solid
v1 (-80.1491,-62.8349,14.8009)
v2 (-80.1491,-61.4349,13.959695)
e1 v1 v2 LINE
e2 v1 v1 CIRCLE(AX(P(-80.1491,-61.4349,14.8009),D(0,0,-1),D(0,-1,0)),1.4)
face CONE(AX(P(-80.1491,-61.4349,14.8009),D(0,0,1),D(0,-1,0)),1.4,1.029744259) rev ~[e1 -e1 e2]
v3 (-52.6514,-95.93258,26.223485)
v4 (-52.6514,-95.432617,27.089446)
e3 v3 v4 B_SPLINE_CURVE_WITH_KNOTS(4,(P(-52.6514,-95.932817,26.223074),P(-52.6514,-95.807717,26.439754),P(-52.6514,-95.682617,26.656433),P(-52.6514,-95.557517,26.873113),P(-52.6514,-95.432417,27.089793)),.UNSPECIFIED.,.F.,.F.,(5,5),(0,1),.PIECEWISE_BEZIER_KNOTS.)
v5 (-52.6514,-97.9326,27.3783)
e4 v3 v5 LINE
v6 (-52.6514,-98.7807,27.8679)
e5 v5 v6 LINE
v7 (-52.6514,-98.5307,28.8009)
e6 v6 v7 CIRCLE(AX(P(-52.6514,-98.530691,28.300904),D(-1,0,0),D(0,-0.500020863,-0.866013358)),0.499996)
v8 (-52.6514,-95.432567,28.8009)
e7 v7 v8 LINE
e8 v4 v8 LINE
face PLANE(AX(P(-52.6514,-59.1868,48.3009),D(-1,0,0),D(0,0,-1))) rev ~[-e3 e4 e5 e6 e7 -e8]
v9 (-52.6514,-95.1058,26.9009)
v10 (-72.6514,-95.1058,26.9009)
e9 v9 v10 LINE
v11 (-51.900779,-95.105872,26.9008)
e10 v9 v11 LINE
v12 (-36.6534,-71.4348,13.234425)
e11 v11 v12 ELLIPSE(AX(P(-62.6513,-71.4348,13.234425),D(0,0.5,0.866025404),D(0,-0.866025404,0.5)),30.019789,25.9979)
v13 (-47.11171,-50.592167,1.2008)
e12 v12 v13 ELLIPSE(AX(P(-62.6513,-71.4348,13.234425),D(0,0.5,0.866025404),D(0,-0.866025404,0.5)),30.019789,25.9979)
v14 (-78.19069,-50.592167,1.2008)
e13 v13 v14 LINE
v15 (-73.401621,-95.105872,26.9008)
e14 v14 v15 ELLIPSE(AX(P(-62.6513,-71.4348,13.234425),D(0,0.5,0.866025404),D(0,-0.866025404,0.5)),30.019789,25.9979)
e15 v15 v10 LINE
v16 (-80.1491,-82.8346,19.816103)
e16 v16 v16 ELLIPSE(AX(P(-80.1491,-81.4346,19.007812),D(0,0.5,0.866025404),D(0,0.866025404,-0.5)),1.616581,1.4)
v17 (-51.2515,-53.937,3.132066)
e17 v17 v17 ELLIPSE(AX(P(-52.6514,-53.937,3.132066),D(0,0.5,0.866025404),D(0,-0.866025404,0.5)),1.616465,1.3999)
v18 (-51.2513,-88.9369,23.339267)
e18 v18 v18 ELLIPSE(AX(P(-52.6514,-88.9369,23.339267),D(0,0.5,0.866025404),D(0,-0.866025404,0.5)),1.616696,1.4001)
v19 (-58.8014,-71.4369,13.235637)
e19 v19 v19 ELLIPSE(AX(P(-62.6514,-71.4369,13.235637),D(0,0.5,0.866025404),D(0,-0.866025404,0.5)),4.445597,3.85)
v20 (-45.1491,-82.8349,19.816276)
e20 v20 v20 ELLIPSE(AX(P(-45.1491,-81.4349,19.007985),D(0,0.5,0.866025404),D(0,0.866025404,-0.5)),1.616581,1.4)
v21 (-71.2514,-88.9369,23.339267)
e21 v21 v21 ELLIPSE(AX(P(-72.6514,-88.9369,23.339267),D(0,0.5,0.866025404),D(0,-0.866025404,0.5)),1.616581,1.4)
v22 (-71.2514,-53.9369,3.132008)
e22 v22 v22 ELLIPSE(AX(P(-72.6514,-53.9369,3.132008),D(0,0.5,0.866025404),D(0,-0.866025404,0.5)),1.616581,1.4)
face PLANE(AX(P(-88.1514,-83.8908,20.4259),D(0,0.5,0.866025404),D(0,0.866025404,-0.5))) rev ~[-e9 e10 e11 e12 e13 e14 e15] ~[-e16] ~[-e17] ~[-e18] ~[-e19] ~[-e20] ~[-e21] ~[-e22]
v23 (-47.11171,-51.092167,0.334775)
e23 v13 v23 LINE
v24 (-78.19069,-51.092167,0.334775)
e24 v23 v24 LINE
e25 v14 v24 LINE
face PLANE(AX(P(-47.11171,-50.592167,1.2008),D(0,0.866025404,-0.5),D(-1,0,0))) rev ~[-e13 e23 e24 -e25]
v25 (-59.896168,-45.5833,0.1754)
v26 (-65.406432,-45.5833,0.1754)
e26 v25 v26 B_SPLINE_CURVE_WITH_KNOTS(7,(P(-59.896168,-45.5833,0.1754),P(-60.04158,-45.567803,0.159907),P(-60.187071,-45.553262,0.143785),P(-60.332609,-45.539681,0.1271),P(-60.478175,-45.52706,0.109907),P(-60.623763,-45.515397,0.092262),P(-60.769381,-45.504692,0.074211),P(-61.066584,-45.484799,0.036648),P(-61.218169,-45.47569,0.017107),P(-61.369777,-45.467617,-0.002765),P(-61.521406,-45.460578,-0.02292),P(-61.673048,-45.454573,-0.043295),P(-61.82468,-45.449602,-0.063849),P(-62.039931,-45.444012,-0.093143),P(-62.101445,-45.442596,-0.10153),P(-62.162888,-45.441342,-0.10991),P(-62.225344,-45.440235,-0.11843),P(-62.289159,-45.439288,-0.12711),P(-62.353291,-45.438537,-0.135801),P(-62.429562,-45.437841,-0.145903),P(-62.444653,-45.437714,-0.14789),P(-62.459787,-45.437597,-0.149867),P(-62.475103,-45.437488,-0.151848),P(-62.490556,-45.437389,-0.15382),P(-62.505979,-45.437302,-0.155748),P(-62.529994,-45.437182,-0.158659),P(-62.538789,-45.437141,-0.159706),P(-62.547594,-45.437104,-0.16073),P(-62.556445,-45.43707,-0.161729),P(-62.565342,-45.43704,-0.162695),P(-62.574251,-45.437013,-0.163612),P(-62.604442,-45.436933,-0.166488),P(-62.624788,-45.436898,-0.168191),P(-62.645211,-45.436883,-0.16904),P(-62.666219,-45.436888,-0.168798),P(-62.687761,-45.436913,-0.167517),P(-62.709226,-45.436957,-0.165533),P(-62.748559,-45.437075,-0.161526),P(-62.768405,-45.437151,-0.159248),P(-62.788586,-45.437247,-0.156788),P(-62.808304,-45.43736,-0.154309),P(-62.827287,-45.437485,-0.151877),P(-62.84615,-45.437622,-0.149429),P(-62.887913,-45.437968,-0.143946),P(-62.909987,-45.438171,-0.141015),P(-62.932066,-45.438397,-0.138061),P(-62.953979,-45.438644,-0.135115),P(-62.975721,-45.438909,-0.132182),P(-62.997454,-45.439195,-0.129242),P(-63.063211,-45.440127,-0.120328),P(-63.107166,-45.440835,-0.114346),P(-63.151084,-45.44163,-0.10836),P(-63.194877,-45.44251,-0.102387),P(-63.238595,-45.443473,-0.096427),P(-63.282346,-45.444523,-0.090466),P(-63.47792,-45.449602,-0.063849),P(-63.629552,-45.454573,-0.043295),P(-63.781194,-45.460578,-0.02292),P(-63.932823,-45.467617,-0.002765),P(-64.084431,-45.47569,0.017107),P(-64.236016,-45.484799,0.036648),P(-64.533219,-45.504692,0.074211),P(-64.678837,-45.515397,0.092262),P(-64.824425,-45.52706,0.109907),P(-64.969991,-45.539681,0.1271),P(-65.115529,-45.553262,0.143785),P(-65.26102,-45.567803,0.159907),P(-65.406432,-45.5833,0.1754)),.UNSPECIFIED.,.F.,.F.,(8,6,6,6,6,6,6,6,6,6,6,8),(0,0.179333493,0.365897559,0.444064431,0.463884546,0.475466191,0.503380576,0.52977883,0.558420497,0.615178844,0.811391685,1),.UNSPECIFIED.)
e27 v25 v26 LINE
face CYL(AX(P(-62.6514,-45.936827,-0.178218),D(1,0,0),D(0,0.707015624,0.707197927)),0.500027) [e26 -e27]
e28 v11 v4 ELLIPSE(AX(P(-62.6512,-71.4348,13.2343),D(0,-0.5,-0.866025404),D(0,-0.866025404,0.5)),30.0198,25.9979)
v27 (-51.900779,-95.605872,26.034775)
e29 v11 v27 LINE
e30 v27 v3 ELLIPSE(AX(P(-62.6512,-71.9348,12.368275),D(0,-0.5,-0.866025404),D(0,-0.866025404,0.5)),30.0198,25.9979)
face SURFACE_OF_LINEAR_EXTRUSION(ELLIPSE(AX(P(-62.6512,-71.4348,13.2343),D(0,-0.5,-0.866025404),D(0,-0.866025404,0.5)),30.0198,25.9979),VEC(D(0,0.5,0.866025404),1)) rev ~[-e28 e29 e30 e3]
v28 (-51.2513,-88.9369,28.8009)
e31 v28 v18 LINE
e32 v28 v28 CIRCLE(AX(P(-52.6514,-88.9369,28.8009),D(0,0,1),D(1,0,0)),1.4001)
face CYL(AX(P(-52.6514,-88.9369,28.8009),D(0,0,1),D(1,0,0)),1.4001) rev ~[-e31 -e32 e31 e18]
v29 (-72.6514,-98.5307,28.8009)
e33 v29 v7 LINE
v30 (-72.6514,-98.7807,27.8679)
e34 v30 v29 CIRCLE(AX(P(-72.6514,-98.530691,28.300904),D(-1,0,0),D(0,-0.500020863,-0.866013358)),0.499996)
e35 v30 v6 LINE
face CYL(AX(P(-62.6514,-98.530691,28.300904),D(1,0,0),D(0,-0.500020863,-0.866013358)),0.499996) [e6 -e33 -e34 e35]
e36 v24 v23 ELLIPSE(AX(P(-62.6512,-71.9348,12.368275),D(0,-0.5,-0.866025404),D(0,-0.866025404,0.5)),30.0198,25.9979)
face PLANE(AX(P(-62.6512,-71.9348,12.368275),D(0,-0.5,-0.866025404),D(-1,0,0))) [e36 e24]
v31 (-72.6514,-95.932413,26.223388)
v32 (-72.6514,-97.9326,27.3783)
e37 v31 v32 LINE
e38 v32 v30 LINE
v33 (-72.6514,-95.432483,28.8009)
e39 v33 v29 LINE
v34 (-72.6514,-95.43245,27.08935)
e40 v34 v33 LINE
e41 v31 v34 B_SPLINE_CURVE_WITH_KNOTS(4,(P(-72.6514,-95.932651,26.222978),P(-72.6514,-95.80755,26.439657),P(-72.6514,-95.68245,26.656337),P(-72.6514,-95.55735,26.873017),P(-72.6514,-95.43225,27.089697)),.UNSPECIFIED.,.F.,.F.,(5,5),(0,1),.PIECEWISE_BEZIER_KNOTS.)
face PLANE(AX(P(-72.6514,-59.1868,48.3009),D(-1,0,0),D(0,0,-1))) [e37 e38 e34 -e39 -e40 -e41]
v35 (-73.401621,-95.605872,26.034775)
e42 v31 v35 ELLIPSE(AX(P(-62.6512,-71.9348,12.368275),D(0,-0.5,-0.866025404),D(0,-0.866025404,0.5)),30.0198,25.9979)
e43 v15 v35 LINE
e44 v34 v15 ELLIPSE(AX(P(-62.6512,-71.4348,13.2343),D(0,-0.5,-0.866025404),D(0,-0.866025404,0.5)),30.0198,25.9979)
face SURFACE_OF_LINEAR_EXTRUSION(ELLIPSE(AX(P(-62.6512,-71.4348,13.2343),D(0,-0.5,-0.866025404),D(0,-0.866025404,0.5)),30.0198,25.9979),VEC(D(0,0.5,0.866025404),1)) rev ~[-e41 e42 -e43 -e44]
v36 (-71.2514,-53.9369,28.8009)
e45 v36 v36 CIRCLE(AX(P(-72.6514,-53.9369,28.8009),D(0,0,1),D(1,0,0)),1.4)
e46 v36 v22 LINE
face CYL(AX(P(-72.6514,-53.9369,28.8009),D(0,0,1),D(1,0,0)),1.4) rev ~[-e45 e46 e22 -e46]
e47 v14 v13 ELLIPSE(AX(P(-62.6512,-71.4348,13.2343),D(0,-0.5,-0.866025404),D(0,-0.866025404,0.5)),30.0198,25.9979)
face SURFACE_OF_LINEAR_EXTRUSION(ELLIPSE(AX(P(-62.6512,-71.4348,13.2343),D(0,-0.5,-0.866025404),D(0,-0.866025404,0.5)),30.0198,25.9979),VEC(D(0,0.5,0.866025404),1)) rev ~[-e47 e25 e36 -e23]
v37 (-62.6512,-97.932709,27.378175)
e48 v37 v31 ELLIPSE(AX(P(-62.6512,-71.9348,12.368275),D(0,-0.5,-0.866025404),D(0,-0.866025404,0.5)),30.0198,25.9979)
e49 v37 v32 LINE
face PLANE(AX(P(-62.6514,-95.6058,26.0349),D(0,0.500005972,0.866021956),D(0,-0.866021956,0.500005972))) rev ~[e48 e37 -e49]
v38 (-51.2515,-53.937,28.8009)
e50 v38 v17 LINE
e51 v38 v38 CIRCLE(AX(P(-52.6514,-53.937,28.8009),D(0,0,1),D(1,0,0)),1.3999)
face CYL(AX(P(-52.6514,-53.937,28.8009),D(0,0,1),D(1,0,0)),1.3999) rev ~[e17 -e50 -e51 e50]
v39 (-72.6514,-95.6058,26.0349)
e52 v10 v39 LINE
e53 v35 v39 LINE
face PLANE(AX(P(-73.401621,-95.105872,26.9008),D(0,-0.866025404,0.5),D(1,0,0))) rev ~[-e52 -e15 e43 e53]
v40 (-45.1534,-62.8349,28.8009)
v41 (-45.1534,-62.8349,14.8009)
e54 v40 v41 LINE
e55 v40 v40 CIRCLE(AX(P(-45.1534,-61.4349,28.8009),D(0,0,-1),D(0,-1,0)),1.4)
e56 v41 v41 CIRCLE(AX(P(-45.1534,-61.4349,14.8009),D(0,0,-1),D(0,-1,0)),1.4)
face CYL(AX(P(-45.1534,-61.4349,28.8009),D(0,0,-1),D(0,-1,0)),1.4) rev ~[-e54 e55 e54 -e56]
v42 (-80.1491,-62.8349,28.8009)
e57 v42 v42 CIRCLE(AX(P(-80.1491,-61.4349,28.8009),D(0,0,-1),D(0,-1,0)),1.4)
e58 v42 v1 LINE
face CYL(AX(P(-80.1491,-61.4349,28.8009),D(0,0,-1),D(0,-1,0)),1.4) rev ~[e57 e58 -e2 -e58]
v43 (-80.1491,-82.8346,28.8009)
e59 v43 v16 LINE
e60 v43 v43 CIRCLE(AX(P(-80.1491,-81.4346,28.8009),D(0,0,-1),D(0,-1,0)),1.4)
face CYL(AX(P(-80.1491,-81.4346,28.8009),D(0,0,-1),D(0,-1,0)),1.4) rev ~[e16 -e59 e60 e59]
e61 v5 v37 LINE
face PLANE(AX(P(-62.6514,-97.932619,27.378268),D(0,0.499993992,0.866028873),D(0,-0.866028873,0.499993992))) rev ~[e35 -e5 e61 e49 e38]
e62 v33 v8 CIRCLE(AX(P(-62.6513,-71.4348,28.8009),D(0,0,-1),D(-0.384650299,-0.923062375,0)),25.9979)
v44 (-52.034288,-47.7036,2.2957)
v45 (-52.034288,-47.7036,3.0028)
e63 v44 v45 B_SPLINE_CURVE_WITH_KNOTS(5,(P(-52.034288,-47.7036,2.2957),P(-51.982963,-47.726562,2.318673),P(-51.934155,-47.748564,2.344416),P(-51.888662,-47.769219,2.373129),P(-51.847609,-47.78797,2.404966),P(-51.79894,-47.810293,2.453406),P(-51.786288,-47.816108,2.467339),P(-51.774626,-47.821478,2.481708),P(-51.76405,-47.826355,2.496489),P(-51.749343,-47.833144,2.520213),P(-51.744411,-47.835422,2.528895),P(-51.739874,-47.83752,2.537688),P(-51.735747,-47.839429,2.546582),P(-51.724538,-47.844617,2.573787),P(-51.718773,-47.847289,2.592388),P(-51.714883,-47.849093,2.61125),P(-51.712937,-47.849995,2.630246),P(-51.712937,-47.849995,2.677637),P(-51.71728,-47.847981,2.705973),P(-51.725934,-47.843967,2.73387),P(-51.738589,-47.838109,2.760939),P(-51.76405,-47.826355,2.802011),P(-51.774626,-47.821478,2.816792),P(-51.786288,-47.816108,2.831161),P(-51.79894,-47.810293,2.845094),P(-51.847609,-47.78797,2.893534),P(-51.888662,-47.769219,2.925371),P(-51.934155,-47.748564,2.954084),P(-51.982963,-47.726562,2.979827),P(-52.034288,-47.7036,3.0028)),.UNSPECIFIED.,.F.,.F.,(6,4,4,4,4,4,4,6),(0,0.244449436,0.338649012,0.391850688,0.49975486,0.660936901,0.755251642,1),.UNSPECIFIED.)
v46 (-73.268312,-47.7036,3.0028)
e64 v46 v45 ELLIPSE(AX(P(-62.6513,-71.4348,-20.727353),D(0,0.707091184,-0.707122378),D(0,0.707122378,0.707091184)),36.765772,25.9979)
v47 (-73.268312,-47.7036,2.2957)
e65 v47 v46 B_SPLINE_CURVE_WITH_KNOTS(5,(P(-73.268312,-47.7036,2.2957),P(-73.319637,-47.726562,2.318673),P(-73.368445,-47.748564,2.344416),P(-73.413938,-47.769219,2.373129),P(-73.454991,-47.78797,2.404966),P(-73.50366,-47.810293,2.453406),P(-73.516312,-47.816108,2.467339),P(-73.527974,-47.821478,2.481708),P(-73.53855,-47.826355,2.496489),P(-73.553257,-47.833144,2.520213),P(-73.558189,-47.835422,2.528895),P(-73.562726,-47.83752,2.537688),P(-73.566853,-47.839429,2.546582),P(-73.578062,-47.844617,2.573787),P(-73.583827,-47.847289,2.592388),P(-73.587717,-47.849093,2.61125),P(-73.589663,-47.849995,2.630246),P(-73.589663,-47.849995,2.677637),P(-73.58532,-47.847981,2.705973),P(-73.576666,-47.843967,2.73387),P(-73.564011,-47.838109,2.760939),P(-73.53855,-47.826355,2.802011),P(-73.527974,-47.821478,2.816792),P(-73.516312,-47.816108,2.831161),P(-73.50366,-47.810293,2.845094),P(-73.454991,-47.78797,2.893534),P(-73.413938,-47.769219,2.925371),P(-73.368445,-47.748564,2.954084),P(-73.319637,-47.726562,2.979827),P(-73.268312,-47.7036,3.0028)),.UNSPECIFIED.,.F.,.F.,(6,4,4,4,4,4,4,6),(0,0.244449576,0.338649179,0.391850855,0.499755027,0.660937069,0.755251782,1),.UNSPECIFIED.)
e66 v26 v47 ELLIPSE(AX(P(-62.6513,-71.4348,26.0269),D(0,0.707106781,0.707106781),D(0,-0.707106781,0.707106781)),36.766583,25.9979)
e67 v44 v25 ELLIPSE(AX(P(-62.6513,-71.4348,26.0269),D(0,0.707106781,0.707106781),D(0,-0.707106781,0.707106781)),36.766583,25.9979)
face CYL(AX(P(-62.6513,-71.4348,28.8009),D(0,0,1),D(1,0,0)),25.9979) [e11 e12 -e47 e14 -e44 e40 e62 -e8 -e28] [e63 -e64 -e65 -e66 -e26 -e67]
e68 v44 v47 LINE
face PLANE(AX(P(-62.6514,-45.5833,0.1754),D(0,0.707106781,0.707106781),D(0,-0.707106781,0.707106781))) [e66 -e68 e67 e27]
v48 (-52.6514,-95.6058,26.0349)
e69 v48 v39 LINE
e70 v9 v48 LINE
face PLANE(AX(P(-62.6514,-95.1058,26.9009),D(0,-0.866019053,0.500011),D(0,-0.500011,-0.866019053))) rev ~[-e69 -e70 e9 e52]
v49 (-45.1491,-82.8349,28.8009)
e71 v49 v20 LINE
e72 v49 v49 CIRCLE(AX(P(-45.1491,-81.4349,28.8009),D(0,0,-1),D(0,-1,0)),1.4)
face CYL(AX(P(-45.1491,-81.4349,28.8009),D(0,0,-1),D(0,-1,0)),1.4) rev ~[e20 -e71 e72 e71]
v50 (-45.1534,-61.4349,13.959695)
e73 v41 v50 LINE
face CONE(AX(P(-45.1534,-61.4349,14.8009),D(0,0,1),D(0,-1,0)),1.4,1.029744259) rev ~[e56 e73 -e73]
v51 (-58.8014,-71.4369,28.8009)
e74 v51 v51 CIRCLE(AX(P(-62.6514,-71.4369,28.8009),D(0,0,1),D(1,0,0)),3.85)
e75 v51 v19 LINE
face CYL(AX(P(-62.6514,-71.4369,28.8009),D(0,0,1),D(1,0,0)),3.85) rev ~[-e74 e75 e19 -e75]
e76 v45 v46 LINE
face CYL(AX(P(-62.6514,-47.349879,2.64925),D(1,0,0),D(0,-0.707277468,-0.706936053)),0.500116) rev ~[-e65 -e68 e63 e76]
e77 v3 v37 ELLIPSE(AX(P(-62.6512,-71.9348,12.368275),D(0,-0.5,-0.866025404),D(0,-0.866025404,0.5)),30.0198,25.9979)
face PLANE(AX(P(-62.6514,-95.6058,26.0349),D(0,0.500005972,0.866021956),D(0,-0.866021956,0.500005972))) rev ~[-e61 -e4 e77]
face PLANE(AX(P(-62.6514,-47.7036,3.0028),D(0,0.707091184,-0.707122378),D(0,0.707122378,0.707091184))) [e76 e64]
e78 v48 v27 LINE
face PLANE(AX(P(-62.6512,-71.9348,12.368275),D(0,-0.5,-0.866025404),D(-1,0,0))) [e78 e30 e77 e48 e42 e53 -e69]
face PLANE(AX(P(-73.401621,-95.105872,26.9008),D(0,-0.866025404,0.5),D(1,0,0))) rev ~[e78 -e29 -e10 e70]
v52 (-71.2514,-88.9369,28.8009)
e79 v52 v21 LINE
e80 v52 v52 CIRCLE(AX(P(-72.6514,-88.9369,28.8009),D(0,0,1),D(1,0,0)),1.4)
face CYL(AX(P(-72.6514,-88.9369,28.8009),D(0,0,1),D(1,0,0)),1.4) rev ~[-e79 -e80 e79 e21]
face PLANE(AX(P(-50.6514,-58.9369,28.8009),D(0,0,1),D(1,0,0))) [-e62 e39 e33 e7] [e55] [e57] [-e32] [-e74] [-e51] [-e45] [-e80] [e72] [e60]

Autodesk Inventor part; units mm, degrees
ref_plane "YZ Plane" through (0, 0, 0) normal (1, 0, 0) x (0, 1, 0)
ref_plane "XZ Plane" through (0, 0, 0) normal (0, 1, 0) x (-1, 0, 0)
ref_plane "Work Plane1" through (-50.6514, -58.9369, 28.8009) normal (0, 0, 1) x (1, 0, 0)
ref_plane "Arbeitsebene5" through (-88.1514, -83.8908, 20.4259) normal (0, 0.5, 0.8660254) x (1, 0, 0)
sketch "Sketch1" plane through (-50.6514, -58.9369, 28.8009) normal (0, 0, 1) x (1, 0, 0)
  circle A0 centre (-11.9999, -12.4979) radius 25.9979 projected
  circle A1 centre (-2, 4.9999) radius 1.3999 projected
  circle A2 centre (-22, 5) radius 1.4 projected
  circle A3 centre (-12, -12.5) radius 3.85 projected
  line L0 (-5, -5) -> (-5, 0) projected
  line L1 (0, 0) -> (0, -5) projected
  circle A4 centre (-22, -30) radius 1.4 projected
  circle A5 centre (-2, -30) radius 1.4001 projected
  line L2 (-5, 0) -> (0, 0)
  line L3 (0, 0) -> (0, -5)
  line L4 (0, -5) -> (-5, -5)
  line L5 (-5, -5) -> (-5, 0)
  circle A6 centre (-12, -12.5) radius 4
  point P0 (50.6514, 58.9369)
  dimension "d2" = 8
extrude "Extrusion1" add sketch "Sketch1" against normal up to surface contours A0 | L0 L2 L1 L4 | A6 surface through (-88.1514, -83.8908, 20.4259) normal (0, 0.5, 0.8660254)
sketch "Skizze17" plane through (-62.6512, -71.4348, 13.2343) normal (0, -0.5, -0.8660254) x (-1, 0, 0)
  line L0 (23.5002, 23.867) -> (-23.4998, 23.867) projected
  arc A0 (-23.4998, 23.867) -> (-25.4998, 21.867) centre (-23.4998, 21.867) ccw projected
  line L1 (-25.4998, 21.867) -> (-25.4998, -25.133) projected
  arc A1 (-25.4998, -25.133) -> (-23.4998, -27.133) centre (-23.4998, -25.133) ccw projected
  line L2 (-23.4998, -27.133) -> (23.5002, -27.133) projected
  arc A2 (23.5002, -27.133) -> (25.5002, -25.133) centre (23.5002, -25.133) ccw projected
  line L3 (25.5002, -25.133) -> (25.5002, 21.867) projected
  arc A3 (25.5002, 21.867) -> (23.5002, 23.867) centre (23.5002, 21.867) ccw projected
  line L4 (-17.4998, 11.367) -> (17.5002, 11.367) projected
  line L5 (17.5002, 11.367) -> (17.5002, -12.633) projected
  line L6 (17.5002, -12.633) -> (-17.4998, -12.633) projected
  line L7 (-17.4998, -12.633) -> (-17.4998, 11.367) projected
  line L8 (-23.4998, 24.067) -> (23.5002, 24.067)
  arc A4 (25.7002, 21.867) -> (23.5002, 24.067) centre (23.5002, 21.867) ccw
  line L9 (25.7002, 21.867) -> (25.7002, -25.133)
  arc A5 (23.5002, -27.333) -> (25.7002, -25.133) centre (23.5002, -25.133) ccw
  line L10 (23.5002, -27.333) -> (-23.4998, -27.333)
  arc A6 (-25.6998, -25.133) -> (-23.4998, -27.333) centre (-23.4998, -25.133) ccw
  line L11 (-25.6998, -25.133) -> (-25.6998, 21.867)
  arc A7 (-23.4998, 24.067) -> (-25.6998, 21.867) centre (-23.4998, 21.867) ccw
  ellipse E0 centre (-9.9998, 20.2048) end of major axis (-9.9998, 21.8213) minor radius 1.3999 projected
  ellipse E1 centre (10.0001, 20.2048) end of major axis (10.0001, 21.8213) minor radius 1.4 projected
  ellipse E2 centre (0.0001, -0.0025) end of major axis (0.0001, 4.4432) minor radius 3.85 projected
  ellipse E3 centre (10.0001, -20.2097) end of major axis (10.0001, -18.5931) minor radius 1.4 projected
  ellipse E4 centre (-9.9999, -20.2096) end of major axis (-9.9999, -18.593) minor radius 1.4001 projected
  ellipse E5 centre (0, 0) end of major axis (0, -30.0198) minor radius 25.9979 projected
  point P0 (-62.6512, 68.4815)
  point P1 (15.5395, 24.067)
  point P2 (-15.5395, 24.067)
  point P3 (10.7503, -27.333)
  point P4 (-10.7503, -27.333)
  dimension "d65" = 0.2
extrude "Extrusion13" add sketch "Skizze17" along normal blind 1 contours L8 E5 | E5 L10
ref_plane "Arbeitsebene6" through (-62.6514, -59.1868, 48.3009) normal (-1, 0, 0) x (0, 0, -1)
sketch "Skizze18" plane through (-62.6514, -59.1868, 48.3009) normal (-1, 0, 0) x (0, 0, -1)
  line L0 (47.1, -8.5947) -> (47.1, -8.5947) projected
  line L1 (47.1, -8.5947) -> (47.966, -8.0947) projected
  line L2 (47.966, -8.0947) -> (47.966, -8.0947) projected
  line L3 (47.1, -8.5947) -> (47.966, -8.0947) projected
  line L4 (21.4, 35.919) -> (21.4, 35.919) projected
  line L5 (21.4, 35.919) -> (22.266, 36.419) projected
  line L6 (22.266, 36.419) -> (22.266, 36.419) projected
  line L7 (21.4, 35.919) -> (22.266, 36.419) projected
  line L8 (21.4, 35.919) -> (22.266, 36.419) projected
  line L9 (22.266, 36.419) -> (19.5, 34.8221)
  line L10 (19.5, 38.2458) -> (19.5, -13.75) projected
  line L11 (22.266, 36.419) -> (19.5, 34.8221)
  line L12 (22.266, 36.419) -> (20.9226, 38.7458) projected
  line L13 (22.266, 36.419) -> (20.433, 39.5939)
  line L14 (19.5, 39.3439) -> (19.5, 34.8221)
  arc A0 (20.433, 39.5939) -> (19.5, 39.3439) centre (20, 39.3439) ccw
  point P0 (48.3009, -59.1868)
  point P1 (19.5, 38.2458)
  point P2 (20.9226, 38.7458)
  dimension "d68" = 0.5
extrude "Extrusion14" add sketch "Skizze18" along normal mid plane 20
sketch "Skizze19" plane through (-62.6514, -59.1868, 48.3009) normal (-1, 0, 0) x (0, 0, -1)
  line L0 (47.1, -8.5947) -> (47.1, -8.5947) projected
  line L1 (47.1, -8.5947) -> (47.966, -8.0947) projected
  line L2 (47.966, -8.0947) -> (47.966, -8.0947) projected
  line L3 (47.1, -8.5947) -> (47.966, -8.0947) projected
  line L4 (48.1255, -13.6035) -> (46.0052, -11.4832)
  line L5 (48.4791, -13.75) -> (51.4776, -13.75) construction
  line L6 (45.2981, -11.4832) -> (43.0314, -13.75)
  line L7 (19.5, -13.75) -> (50.0764, -13.75) projected
  line L8 (43.0314, -13.75) -> (48.272, -13.75)
  arc A0 (46.0052, -11.4832) -> (45.2981, -11.4832) centre (45.6517, -11.8368) ccw
  arc A1 (48.1255, -13.6035) -> (48.4791, -13.75) centre (48.4791, -13.25) ccw
  point P0 (48.3009, -59.1868)
  point P1 (48.4791, -13.75)
  dimension "d71" = 135
  dimension "d72" = 90
  dimension "d73" = 0.5
extrude "Extrusion15" cut sketch "Skizze19" along normal through all both and the other way through all
sketch "Skizze20" plane through (-50.6514, -58.9369, 28.8009) normal (0, 0, 1) x (1, 0, 0)
  circle A0 centre (-29.4977, -2.4981) radius 1.3999
  circle A1 centre (-29.4977, -22.498) radius 1.4
  circle A2 centre (-11.9977, -12.498) radius 3.85
  circle A3 centre (5.5022, -22.498) radius 1.4
  circle A4 centre (5.5022, -2.498) radius 1.4001
  arc A5 (-2.0001, -36.4957) -> (-22.0001, -36.4955) centre (-11.9999, -12.4979) ccw
  line L0 (-22.0001, -39.5939) -> (-22.0001, -36.4955)
  line L1 (-22.0001, -39.5939) -> (-2.0001, -39.5939)
  line L2 (-2.0001, -36.4957) -> (-2.0001, -39.5939)
  line L3 (5.498, -22.4977) -> (5.498, -2.4981)
  line L4 (5.498, -2.4981) -> (-29.4977, -2.4981)
  line L5 (-29.4977, -2.4981) -> (-29.4977, -22.4977)
  line L6 (-29.4977, -22.4977) -> (5.498, -22.4977)
  line L7 (5.498, -22.4977) -> (-29.4977, -2.4981) construction
  line L8 (5.498, -2.4981) -> (-29.4977, -22.4977) construction
  point P0 (50.6514, 58.9369)
hole "Bohrung3" at (-80.1491, -61.4349, 28.8009) at (-80.1491, -81.4346, 28.8009) at (-45.1491, -81.4349, 28.8009) at (-45.1534, -61.4349, 28.8009) direction (0, 0, -1) diameter 2.8 depth 14 tip angle 118
properties part number "Spectrometer_gratingholder_v0"
